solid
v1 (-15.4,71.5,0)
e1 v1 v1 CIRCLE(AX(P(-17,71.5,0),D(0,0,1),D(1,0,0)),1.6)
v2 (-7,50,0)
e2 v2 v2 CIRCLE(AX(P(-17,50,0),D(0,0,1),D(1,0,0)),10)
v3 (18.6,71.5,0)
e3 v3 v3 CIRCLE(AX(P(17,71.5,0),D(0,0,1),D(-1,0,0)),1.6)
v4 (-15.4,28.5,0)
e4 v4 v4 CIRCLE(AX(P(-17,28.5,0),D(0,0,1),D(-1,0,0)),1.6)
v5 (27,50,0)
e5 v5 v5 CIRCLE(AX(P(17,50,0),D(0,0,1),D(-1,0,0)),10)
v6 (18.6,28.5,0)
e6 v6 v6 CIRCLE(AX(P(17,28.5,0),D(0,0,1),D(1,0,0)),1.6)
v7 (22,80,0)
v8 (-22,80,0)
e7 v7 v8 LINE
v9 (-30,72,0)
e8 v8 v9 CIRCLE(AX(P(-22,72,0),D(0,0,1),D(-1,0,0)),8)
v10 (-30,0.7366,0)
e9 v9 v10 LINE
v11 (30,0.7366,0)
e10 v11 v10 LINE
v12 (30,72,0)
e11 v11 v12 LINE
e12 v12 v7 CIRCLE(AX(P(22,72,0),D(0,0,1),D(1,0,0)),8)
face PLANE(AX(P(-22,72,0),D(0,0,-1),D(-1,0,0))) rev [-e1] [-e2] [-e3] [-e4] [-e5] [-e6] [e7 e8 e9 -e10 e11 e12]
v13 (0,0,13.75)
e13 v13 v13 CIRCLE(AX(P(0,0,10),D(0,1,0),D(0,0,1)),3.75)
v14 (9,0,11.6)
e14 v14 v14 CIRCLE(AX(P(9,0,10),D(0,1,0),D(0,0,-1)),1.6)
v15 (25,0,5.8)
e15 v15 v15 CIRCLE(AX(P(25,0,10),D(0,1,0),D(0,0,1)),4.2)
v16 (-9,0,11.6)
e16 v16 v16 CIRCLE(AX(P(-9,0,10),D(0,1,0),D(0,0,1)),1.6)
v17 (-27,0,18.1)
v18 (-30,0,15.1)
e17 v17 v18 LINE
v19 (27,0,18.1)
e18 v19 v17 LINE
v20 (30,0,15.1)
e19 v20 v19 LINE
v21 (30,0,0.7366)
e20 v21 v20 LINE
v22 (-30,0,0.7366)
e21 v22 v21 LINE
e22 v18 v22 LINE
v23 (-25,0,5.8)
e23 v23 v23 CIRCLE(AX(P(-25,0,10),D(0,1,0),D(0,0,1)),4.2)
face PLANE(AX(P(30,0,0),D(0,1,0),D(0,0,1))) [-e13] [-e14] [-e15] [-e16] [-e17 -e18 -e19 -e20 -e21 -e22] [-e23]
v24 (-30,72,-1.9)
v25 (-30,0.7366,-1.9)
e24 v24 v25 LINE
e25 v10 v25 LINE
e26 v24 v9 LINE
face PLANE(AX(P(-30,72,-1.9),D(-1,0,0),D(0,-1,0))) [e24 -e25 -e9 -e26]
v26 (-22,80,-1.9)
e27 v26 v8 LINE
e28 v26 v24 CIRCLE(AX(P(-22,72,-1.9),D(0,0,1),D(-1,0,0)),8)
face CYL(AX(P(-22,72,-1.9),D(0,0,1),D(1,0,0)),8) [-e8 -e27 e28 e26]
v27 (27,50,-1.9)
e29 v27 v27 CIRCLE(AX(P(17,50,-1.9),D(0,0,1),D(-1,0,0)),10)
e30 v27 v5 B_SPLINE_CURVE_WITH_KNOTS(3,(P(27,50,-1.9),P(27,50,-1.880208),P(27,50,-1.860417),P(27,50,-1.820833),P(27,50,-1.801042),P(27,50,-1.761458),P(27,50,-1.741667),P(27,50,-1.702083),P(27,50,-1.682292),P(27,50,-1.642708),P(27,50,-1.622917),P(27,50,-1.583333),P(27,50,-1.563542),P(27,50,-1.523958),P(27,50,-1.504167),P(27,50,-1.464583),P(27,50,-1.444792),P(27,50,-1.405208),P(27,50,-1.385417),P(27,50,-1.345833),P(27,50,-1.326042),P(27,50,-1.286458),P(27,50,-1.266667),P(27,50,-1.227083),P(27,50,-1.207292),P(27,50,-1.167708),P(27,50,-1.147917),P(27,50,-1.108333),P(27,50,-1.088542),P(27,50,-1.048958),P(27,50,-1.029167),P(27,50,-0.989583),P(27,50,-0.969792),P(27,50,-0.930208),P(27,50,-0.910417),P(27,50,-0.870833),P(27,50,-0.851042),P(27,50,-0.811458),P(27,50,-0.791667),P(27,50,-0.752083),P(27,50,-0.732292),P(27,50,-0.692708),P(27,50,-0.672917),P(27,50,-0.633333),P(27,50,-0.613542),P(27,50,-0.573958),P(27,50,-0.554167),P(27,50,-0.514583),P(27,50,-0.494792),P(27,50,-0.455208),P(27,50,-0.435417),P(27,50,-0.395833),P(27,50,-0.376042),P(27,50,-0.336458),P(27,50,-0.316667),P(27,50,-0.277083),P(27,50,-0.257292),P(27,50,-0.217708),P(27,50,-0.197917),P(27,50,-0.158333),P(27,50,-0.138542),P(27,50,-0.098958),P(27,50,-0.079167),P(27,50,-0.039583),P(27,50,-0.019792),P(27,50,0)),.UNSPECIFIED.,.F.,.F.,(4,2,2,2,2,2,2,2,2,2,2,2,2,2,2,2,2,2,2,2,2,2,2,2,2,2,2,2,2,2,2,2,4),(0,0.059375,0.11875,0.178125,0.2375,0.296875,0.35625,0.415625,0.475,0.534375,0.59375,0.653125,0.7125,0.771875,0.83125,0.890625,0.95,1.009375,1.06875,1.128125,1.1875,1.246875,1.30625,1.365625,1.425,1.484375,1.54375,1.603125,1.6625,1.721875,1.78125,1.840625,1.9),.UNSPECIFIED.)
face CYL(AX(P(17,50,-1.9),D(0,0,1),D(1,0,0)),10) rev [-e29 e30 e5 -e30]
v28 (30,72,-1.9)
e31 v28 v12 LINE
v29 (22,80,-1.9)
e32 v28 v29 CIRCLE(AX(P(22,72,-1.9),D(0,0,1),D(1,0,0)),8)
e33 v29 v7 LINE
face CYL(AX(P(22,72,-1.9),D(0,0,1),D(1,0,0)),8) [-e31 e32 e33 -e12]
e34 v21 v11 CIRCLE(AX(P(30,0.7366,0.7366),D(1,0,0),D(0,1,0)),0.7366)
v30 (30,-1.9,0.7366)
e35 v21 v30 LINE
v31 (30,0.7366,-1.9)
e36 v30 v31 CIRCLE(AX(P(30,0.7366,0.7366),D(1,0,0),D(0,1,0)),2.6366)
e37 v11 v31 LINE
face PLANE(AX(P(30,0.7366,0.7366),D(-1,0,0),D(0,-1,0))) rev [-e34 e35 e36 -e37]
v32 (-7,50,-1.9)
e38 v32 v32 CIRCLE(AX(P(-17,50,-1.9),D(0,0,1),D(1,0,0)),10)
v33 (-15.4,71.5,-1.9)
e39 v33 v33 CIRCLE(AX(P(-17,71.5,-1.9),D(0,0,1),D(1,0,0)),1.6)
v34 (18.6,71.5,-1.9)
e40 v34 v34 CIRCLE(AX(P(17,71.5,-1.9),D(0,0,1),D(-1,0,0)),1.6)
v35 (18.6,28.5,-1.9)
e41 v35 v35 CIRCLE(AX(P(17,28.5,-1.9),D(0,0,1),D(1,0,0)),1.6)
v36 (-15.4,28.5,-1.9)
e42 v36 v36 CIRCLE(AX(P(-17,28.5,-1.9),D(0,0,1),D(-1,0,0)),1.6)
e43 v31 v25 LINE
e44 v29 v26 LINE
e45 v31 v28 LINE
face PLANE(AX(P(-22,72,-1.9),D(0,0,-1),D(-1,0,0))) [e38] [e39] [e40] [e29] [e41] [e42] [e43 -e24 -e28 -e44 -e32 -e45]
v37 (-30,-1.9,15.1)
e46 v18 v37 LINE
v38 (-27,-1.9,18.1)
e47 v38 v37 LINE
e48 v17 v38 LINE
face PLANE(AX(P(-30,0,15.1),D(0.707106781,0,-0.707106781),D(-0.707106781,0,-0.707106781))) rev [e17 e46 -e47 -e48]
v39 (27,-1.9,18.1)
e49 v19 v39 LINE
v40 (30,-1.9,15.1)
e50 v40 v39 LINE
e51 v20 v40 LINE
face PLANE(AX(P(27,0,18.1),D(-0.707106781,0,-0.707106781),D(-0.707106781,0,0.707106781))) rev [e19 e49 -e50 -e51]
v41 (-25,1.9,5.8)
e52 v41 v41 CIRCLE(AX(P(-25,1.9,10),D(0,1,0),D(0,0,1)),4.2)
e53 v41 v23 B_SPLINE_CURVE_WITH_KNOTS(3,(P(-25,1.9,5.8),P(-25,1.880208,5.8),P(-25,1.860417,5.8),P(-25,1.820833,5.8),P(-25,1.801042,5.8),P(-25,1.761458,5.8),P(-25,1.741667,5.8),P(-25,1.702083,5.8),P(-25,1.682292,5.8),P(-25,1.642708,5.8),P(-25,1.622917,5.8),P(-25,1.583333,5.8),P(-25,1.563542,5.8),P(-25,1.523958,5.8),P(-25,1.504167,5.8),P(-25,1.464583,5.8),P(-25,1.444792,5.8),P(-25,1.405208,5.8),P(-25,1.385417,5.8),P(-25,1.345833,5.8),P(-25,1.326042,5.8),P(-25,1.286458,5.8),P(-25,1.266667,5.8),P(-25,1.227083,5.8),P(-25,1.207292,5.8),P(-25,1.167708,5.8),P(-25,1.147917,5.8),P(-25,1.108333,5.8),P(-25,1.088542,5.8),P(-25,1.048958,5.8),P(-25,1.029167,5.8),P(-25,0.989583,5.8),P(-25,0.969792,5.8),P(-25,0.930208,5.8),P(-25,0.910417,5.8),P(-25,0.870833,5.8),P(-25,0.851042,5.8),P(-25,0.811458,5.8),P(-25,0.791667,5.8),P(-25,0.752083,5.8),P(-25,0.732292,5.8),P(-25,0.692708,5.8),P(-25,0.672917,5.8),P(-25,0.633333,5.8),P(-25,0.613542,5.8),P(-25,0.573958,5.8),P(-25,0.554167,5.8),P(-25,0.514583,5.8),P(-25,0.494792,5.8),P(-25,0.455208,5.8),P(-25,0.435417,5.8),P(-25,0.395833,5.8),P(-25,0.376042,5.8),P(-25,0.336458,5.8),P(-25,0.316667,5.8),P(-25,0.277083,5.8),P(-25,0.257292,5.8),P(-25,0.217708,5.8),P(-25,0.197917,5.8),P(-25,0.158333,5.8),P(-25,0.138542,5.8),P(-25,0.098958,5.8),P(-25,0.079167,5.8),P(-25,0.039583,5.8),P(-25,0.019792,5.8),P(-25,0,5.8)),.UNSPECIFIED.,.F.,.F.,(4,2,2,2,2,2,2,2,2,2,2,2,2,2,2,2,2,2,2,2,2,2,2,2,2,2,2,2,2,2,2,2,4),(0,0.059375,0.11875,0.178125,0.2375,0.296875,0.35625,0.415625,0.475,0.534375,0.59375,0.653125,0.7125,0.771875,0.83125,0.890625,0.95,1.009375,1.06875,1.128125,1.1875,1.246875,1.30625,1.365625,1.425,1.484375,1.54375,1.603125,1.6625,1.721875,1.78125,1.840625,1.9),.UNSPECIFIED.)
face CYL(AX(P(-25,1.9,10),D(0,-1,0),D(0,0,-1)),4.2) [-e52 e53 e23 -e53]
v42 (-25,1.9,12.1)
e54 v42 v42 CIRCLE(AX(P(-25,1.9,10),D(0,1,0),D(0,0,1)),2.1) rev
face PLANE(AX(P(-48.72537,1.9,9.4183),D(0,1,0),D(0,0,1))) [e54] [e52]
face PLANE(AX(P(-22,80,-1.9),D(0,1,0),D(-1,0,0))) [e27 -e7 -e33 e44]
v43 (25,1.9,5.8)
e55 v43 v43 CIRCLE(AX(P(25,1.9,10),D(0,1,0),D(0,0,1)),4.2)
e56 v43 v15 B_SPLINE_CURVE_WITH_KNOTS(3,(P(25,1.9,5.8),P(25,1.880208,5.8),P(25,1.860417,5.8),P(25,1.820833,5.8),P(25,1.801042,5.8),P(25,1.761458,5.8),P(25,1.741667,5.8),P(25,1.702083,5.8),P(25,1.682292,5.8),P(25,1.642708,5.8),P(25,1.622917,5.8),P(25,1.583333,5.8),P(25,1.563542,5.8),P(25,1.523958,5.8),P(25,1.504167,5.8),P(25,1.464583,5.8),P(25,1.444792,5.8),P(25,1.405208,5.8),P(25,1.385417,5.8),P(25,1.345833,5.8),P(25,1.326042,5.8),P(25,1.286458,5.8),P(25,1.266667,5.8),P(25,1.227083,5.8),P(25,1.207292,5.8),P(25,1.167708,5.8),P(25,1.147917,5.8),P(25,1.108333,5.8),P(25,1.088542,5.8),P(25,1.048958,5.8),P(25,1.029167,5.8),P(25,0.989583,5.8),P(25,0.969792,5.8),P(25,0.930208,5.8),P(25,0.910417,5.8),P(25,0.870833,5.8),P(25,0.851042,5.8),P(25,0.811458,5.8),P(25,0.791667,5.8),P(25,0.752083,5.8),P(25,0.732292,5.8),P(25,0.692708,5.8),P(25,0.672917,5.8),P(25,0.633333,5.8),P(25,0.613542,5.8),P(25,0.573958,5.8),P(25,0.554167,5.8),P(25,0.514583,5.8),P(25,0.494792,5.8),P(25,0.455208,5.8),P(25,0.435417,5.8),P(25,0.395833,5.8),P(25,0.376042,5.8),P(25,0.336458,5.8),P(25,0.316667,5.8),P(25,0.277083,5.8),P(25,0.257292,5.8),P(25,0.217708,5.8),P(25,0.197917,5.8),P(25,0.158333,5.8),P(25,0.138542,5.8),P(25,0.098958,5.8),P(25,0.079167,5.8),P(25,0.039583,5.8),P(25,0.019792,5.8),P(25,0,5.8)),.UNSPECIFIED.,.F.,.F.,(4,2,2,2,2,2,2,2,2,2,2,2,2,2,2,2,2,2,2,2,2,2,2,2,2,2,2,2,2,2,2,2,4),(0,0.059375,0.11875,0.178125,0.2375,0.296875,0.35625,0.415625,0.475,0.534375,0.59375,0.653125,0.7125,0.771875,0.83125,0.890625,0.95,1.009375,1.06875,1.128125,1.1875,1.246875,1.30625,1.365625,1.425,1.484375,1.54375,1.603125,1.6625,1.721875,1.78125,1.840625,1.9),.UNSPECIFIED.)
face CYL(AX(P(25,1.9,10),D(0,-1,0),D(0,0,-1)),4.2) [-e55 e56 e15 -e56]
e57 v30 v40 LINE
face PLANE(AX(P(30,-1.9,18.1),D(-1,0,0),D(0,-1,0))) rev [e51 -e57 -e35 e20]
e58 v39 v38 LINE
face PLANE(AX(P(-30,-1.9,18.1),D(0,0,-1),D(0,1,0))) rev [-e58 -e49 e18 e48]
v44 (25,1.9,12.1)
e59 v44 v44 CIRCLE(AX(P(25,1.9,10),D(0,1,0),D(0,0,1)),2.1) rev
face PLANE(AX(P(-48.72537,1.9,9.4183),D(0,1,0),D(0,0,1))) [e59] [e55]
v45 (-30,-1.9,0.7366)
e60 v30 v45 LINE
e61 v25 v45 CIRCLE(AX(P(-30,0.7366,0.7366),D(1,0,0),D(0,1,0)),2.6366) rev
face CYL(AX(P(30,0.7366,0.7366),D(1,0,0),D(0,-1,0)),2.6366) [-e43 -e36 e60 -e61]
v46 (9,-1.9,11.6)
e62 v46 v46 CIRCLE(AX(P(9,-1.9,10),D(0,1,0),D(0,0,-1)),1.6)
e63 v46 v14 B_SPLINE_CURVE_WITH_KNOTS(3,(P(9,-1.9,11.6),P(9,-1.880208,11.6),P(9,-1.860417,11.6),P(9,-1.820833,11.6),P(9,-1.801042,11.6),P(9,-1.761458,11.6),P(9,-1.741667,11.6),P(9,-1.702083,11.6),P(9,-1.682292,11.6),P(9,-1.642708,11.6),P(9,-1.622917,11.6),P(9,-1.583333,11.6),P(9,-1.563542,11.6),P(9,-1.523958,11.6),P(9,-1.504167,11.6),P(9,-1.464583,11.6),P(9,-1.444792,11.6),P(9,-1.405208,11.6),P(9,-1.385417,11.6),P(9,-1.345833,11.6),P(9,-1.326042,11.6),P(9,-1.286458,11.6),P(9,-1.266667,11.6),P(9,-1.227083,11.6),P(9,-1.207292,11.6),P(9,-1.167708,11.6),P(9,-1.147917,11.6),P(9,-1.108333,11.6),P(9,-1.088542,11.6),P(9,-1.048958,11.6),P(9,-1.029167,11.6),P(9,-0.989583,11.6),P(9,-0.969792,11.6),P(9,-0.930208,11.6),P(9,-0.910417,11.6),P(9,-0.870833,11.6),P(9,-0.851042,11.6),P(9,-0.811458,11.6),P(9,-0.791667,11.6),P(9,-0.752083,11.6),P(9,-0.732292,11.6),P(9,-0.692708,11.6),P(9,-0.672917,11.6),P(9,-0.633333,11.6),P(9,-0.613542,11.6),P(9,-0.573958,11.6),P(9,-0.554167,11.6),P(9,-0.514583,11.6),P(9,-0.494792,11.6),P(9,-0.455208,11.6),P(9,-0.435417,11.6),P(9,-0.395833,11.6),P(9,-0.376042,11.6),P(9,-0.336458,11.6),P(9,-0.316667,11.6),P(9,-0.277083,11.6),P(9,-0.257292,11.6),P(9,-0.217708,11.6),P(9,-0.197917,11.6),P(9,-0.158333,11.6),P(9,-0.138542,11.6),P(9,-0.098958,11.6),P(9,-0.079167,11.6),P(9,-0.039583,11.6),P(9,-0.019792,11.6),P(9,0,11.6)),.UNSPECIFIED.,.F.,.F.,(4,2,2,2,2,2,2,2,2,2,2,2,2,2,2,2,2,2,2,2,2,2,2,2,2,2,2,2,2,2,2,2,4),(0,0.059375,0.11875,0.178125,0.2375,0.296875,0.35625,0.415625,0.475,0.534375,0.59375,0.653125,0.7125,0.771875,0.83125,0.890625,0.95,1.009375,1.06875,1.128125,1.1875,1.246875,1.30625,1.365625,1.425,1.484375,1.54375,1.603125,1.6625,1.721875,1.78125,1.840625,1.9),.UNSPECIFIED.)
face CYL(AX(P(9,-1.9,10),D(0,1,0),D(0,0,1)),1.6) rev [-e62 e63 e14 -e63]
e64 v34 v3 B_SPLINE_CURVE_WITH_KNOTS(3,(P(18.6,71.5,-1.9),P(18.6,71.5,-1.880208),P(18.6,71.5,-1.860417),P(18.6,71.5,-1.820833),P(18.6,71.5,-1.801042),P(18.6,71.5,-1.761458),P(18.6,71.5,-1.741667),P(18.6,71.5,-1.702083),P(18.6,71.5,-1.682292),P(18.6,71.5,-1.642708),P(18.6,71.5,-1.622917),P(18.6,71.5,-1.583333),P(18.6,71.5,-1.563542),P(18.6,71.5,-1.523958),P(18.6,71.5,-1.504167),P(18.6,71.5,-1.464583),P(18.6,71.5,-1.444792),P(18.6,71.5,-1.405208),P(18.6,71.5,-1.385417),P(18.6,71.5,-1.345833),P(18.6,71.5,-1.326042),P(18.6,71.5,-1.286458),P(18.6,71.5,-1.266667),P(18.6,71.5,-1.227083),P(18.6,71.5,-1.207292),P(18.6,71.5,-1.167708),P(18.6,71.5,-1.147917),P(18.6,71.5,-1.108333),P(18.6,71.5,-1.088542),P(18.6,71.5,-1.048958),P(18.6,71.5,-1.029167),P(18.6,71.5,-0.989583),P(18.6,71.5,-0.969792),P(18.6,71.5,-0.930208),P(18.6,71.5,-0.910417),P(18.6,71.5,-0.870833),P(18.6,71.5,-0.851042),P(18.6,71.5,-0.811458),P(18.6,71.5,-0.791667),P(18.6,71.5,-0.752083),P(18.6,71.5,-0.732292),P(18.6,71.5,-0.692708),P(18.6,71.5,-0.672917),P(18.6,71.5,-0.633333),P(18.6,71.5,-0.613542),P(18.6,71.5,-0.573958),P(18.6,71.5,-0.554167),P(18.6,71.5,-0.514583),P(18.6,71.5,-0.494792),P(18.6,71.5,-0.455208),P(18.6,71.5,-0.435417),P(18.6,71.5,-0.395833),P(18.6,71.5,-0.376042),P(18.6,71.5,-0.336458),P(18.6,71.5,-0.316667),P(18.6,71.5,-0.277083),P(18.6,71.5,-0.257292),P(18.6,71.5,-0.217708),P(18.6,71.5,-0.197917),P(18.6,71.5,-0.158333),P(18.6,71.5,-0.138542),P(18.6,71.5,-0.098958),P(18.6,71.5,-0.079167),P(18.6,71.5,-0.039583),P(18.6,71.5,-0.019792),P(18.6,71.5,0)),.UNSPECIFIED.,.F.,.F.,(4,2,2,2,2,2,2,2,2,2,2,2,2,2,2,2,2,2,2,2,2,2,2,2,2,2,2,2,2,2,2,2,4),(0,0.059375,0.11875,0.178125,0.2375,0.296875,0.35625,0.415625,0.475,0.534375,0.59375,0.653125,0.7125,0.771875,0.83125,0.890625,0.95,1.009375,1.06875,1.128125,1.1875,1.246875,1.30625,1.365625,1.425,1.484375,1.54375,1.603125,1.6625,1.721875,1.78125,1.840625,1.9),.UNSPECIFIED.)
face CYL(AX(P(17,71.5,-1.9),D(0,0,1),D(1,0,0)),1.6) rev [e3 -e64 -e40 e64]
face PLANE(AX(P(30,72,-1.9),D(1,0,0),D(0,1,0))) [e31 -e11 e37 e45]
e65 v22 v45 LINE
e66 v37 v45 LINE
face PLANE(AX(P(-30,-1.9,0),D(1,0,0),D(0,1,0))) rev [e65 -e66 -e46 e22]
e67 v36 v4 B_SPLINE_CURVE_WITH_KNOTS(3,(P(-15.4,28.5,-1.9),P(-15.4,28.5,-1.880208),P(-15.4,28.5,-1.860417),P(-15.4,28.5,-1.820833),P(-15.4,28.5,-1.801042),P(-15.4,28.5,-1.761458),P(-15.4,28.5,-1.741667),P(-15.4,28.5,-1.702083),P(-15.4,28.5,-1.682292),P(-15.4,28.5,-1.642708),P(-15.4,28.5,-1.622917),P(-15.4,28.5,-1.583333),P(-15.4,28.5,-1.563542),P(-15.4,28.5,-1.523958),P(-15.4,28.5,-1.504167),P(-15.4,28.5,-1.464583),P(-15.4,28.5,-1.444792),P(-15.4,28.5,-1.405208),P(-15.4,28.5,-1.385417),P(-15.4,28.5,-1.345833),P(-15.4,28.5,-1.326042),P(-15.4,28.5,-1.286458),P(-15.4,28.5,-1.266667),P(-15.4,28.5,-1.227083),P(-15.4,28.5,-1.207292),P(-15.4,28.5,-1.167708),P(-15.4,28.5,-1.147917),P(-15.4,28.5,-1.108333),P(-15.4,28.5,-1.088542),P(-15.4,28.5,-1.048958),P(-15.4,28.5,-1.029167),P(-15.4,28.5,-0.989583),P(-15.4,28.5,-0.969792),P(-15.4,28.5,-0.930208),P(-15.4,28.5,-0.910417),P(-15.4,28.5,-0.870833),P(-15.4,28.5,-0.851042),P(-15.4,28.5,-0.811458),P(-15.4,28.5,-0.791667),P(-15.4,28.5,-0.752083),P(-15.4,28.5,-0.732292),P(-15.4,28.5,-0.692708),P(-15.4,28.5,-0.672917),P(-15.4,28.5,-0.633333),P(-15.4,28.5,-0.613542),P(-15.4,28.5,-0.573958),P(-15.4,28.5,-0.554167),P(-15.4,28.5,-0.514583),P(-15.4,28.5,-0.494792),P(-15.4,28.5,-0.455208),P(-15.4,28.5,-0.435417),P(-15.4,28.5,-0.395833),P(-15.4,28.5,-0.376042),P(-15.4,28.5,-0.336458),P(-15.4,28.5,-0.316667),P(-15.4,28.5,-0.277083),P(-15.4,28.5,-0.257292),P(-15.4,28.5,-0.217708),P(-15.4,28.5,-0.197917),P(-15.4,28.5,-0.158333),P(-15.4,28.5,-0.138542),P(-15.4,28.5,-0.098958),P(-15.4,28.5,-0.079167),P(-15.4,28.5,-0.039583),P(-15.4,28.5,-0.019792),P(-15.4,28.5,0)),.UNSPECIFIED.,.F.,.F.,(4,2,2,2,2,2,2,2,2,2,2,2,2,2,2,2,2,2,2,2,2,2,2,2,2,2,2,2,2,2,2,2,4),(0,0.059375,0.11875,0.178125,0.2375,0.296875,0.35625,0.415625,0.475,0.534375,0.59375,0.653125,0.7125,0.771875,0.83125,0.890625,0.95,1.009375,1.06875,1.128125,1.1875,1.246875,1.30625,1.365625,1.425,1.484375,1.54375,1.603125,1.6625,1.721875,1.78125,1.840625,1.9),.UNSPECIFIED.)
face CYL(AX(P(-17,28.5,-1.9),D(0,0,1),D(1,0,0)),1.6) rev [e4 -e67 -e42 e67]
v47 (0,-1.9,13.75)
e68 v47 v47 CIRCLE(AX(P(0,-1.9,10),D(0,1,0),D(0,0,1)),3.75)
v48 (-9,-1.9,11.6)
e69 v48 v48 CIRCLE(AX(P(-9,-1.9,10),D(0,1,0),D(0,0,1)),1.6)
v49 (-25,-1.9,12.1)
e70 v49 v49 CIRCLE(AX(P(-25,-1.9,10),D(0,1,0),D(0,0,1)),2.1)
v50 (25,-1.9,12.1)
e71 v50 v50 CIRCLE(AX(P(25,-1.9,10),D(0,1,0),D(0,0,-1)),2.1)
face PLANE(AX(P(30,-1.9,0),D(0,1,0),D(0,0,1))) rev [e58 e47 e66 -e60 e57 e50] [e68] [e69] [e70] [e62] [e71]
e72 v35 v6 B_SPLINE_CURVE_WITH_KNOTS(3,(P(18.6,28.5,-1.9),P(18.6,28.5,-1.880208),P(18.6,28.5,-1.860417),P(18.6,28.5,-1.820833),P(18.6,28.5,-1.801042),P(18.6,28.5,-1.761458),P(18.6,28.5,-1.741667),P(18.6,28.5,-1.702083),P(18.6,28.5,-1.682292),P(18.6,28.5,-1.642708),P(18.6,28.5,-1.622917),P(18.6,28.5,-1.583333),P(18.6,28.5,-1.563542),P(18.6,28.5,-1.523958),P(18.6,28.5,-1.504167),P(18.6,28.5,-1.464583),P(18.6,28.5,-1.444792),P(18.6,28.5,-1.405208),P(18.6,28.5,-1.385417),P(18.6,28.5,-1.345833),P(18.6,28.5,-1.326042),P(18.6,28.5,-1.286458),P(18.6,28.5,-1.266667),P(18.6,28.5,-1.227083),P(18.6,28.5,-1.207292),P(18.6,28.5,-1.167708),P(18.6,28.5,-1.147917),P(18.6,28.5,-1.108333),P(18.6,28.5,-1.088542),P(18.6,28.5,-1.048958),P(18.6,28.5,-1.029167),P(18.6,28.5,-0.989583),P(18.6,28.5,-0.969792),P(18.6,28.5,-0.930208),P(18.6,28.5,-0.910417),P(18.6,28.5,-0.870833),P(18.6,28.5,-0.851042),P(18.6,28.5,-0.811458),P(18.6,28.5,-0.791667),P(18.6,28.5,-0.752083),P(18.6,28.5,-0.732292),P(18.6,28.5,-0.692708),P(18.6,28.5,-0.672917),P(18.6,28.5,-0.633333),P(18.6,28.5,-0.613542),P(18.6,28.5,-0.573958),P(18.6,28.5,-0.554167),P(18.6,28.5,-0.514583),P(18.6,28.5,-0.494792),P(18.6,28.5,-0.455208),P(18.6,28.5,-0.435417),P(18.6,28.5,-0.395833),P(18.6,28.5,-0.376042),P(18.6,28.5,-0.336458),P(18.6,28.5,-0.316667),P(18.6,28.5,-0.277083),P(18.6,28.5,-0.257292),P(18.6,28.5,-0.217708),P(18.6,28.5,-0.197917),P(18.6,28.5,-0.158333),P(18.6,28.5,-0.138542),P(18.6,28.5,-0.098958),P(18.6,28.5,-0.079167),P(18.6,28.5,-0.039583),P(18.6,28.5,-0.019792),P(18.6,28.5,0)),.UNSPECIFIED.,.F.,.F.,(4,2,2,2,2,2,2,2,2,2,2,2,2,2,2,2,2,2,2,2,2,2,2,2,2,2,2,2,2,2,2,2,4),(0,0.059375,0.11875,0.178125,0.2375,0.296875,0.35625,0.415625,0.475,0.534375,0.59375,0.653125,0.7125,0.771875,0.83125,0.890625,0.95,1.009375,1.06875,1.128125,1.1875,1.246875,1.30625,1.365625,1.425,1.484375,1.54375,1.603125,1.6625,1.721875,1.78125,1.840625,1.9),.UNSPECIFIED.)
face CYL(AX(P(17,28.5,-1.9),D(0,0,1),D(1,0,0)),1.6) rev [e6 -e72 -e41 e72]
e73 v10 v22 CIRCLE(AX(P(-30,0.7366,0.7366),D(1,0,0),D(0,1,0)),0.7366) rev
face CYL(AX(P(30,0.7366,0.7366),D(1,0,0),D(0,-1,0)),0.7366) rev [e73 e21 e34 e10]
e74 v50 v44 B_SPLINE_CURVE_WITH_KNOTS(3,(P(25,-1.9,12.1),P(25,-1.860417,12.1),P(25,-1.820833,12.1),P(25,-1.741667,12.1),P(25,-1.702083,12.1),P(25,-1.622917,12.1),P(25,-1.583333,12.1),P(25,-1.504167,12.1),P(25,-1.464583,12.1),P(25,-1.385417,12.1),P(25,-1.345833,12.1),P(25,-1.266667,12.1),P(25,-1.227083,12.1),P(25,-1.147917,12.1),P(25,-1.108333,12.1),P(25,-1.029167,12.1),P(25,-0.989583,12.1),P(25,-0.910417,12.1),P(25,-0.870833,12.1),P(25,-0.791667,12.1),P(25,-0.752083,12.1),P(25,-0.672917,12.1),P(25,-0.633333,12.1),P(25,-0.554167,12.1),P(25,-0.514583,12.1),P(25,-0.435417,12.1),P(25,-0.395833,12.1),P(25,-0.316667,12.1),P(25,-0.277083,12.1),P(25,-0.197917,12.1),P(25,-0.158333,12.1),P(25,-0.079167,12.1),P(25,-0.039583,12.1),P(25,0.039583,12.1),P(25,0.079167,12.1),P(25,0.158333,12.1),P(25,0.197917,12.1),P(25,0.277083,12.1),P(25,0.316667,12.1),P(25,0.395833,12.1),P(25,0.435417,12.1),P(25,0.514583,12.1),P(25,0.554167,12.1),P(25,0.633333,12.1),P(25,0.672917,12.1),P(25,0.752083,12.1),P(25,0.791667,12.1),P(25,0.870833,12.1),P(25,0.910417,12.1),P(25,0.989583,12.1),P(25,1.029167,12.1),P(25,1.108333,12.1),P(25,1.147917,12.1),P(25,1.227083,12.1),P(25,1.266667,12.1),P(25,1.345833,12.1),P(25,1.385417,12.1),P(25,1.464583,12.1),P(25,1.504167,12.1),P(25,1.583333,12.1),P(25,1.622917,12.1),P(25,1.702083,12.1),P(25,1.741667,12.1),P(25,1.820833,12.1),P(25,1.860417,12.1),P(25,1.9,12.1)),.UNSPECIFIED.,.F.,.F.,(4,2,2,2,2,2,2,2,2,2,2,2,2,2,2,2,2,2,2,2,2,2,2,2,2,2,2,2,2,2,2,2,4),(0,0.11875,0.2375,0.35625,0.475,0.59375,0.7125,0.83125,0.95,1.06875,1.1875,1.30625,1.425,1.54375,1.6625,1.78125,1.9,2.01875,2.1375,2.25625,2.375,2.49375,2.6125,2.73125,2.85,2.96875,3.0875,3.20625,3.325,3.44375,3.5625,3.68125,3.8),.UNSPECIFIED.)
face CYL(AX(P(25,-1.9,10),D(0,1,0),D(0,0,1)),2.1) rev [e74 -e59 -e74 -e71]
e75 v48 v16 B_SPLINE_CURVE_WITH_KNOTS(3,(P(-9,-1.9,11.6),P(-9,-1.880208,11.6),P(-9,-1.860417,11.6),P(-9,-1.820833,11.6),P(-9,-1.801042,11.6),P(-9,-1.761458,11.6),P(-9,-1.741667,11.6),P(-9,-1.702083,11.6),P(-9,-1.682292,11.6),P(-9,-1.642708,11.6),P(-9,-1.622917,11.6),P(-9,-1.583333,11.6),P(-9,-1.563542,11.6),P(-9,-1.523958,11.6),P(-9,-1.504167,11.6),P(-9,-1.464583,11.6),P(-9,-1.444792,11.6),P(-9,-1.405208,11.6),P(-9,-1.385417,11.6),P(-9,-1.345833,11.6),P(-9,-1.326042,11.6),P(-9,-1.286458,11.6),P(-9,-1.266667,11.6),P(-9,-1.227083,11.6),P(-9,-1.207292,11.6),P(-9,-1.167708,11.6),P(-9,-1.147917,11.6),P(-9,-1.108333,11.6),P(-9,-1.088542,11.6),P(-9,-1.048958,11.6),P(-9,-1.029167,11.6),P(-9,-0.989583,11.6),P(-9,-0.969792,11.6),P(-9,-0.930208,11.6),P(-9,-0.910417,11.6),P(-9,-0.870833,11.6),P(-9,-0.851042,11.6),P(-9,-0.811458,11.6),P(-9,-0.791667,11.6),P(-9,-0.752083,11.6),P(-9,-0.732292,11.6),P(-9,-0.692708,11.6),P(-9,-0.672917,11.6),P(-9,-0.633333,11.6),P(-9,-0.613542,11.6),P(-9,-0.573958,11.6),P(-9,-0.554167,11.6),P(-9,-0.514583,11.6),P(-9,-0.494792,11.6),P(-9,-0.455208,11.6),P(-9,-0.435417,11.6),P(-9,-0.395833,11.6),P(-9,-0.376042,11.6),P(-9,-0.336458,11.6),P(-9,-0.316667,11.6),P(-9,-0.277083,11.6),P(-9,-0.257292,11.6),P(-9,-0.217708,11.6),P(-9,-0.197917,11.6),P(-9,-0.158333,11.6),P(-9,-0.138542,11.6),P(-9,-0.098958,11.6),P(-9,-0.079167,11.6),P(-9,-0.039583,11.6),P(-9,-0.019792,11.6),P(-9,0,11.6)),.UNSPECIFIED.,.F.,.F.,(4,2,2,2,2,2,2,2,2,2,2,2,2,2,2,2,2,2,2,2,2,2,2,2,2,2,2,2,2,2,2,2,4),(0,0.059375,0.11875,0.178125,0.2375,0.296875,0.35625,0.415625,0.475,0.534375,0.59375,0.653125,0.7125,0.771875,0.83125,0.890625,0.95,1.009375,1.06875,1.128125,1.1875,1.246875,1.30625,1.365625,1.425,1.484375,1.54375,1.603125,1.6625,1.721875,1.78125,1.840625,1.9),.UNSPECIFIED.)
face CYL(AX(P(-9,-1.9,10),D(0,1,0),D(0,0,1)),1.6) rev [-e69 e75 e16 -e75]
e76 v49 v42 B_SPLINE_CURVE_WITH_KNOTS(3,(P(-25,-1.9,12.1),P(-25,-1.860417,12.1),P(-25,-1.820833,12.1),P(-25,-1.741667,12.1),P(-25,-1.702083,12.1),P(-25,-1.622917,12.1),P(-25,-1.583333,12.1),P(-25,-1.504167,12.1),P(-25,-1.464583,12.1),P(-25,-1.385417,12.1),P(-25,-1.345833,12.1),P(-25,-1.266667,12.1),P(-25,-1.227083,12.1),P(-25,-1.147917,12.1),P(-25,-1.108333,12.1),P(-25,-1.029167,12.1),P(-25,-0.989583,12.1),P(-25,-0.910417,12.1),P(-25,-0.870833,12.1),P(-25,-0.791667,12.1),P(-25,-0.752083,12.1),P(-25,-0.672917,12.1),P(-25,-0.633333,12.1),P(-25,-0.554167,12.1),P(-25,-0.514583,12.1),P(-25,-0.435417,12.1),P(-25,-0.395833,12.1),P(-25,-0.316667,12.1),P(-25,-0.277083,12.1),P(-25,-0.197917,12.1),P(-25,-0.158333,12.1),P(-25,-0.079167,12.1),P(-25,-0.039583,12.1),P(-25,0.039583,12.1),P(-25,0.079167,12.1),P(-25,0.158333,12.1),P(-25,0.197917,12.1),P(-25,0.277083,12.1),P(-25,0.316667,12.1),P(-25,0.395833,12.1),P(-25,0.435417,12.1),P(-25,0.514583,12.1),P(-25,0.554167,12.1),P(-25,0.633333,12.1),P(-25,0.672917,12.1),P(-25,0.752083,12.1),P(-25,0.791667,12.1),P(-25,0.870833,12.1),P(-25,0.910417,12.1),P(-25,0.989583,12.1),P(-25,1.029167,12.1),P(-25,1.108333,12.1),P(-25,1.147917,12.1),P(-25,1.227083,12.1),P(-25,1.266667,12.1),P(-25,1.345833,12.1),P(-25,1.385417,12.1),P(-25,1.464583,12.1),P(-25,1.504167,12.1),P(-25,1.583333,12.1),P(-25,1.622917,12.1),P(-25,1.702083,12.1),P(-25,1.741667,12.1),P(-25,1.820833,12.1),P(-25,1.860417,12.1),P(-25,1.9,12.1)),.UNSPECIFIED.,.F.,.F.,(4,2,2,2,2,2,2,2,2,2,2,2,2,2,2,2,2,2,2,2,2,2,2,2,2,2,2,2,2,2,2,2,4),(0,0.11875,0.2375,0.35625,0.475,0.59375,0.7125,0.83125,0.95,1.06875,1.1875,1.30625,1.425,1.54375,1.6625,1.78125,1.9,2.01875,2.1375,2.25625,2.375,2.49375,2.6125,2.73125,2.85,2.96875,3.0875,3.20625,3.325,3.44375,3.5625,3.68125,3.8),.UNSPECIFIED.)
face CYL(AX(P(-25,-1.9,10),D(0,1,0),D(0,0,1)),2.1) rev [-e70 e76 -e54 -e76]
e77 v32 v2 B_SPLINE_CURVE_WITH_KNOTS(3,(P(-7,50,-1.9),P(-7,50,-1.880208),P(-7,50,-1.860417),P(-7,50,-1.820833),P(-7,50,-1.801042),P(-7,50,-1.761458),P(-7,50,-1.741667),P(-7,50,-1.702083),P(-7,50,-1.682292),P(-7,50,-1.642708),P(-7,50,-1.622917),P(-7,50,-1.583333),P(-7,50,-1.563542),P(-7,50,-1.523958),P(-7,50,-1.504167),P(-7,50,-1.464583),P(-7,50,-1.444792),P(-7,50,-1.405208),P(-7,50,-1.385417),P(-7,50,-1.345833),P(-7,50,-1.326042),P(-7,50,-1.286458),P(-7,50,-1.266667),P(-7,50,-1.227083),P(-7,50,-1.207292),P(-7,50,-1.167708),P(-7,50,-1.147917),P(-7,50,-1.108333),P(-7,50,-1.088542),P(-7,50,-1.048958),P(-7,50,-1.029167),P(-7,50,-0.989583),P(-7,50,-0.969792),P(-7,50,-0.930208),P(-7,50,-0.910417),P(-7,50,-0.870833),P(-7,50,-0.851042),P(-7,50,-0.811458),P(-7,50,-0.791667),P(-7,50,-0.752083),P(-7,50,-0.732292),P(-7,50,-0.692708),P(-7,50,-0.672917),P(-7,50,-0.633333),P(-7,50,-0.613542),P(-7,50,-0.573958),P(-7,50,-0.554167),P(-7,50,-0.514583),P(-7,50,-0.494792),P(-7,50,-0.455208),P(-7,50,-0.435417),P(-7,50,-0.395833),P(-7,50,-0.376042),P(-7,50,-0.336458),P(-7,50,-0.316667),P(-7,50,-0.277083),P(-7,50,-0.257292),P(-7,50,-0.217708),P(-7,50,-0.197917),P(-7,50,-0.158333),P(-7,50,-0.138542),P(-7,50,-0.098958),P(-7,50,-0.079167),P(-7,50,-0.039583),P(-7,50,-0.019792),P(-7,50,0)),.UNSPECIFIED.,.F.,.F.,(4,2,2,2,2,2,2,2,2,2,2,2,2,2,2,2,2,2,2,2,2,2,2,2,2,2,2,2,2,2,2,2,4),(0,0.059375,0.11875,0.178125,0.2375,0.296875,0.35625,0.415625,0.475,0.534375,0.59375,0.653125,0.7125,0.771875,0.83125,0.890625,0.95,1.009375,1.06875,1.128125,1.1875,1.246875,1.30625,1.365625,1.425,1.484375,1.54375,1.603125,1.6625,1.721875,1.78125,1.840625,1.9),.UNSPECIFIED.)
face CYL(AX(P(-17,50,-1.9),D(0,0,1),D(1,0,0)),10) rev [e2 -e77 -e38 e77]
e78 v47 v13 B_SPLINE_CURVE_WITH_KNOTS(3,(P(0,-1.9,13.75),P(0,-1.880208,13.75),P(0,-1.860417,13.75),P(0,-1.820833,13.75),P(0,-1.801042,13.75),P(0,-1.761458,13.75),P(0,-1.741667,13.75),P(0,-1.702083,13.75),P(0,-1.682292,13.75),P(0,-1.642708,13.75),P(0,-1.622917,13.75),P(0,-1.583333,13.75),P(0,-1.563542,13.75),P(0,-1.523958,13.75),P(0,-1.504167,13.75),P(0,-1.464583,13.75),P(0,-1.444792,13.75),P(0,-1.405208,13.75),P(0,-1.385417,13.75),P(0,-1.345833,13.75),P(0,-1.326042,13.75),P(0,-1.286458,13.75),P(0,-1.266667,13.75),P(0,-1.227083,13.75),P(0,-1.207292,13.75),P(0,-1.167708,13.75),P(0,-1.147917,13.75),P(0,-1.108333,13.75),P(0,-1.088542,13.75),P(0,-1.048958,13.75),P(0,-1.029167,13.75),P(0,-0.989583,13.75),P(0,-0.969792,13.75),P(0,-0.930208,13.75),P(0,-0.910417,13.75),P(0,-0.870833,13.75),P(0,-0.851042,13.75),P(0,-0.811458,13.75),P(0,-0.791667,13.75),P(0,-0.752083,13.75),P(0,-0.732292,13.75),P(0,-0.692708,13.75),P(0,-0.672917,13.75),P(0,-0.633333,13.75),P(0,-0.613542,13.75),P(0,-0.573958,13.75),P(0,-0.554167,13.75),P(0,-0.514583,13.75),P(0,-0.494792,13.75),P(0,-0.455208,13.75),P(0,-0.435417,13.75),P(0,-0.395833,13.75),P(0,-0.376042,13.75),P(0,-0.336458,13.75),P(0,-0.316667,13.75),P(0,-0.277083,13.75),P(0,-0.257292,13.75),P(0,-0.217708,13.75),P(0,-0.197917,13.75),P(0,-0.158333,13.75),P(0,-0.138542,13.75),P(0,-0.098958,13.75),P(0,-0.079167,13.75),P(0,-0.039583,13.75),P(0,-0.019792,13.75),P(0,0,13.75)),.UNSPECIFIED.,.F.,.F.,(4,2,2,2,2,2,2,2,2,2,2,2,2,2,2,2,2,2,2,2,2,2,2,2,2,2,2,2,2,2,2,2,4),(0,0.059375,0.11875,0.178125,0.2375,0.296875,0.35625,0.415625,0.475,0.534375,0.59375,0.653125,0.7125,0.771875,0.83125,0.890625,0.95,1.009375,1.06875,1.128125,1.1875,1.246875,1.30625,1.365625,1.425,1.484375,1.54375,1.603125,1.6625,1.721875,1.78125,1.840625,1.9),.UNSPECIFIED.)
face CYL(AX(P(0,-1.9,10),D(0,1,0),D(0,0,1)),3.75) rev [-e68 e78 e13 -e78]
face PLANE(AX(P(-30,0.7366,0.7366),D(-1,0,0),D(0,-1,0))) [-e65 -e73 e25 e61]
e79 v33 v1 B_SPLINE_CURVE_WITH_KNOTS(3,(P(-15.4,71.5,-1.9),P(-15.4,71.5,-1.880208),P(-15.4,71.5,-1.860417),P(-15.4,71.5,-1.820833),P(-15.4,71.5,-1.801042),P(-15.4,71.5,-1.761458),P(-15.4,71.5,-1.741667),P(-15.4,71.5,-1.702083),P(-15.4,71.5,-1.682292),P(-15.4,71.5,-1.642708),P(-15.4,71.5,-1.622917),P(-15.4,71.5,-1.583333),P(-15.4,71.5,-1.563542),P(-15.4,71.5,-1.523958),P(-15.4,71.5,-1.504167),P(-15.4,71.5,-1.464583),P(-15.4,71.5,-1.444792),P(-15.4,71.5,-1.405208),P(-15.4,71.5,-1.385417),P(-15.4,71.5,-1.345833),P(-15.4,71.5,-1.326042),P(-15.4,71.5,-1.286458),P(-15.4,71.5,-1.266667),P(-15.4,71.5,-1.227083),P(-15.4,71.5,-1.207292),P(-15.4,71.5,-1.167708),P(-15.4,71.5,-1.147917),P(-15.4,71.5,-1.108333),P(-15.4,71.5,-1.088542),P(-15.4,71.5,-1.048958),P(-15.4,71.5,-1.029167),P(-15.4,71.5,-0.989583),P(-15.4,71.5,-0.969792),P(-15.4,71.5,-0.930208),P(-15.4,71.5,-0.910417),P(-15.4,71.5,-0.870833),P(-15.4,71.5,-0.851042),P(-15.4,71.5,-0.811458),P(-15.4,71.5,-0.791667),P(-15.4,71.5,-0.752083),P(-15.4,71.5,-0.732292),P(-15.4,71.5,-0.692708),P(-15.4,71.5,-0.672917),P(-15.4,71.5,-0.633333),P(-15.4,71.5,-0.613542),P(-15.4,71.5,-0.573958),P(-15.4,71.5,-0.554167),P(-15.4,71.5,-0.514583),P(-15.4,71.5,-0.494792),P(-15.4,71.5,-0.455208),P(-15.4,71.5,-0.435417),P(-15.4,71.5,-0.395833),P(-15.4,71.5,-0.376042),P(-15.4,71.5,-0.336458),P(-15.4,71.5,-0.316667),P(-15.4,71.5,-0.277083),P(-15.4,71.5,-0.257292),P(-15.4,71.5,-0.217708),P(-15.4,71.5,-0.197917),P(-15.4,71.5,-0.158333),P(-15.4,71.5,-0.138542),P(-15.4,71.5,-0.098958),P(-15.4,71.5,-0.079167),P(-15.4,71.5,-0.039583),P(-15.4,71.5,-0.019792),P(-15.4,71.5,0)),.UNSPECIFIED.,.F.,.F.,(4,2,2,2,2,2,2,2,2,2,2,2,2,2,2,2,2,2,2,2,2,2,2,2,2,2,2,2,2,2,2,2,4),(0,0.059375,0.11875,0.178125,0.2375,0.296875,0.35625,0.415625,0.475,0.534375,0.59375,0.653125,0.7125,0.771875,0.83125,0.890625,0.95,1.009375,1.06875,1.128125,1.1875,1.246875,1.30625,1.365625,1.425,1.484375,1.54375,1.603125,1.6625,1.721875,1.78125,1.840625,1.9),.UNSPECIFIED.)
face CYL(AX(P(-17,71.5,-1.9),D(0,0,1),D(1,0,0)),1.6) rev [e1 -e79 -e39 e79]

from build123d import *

# Parameters (mm, degrees)
SM_BASE_FLANGE_1_DEPTH           = 1.9
SM_EDGE_FLANGE_1_STRIP_W         = 9.0732
SM_EDGE_FLANGE_1_STRIP_H         = 1.9
SM_EDGE_FLANGE_1_STRIP_CUT_DEPTH = 60
SM_EDGE_FLANGE_1_DEPTH           = 60
CUT_EXTRUDE_1_DEPTH              = 88.336189521
SKETCH_9_R                       = 2.1
SKETCH_9_R_2                     = 1.6
SKETCH_9_R_3                     = 3.75
CUT_EXTRUDE_2_DEPTH              = 88.336189521
EXTRUDE_START                    = 1.9
SKETCH_10_R                      = 4.2
SKETCH_10_R_2                    = 2.1
EXTRUDE_2_DEPTH                  = 1.9
SKETCH_11_R                      = 1.6
SKETCH_11_R_2                    = 10
CUT_EXTRUDE_3_DEPTH              = 88.336189521


# Sheet-metal steps are written as plain solids
with BuildPart() as part:
    # Sketch 1 → 基体-法兰1 (new body)
    with BuildSketch(Plane.XY):
        with BuildLine():
            Line((-22, 80), (22, 80))
            ThreePointArc((22, 80), (27.656854249, 77.656854249), (30, 72))
            Line((30, 72), (30, 0))
            Line((30, 0), (-30, 0))
            Line((-30, 0), (-30, 72))
            ThreePointArc((-30, 72), (-27.656854249, 77.656854249), (-22, 80))
        make_face()
    extrude(amount=-SM_BASE_FLANGE_1_DEPTH)

    # 边线-法兰1 strip (across the edge) → 边线-法兰1 strip cut (cut)
    with BuildSketch(Plane.YZ.offset(-30)):
        with Locations((-3.8, -0.95)):
            Rectangle(SM_EDGE_FLANGE_1_STRIP_W, SM_EDGE_FLANGE_1_STRIP_H)
    extrude(amount=SM_EDGE_FLANGE_1_STRIP_CUT_DEPTH, mode=Mode.SUBTRACT)

    # 边线-法兰1 section (across the edge) → 边线-法兰1 (add)
    with BuildSketch(Plane.YZ.offset(-30)):
        with BuildLine():
            Line((-1.9, 0.7366), (-1.9, 18.1))
            Line((-1.9, 18.1), (0, 18.1))
            Line((0, 18.1), (0, 0.7366))
            ThreePointArc((0, 0.7366), (0.215745145, 0.215745145), (0.7366, 0))
            Line((0.7366, 0), (0.7366, -1.9))
            ThreePointArc((0.7366, -1.9), (-1.127757739, -1.127757739), (-1.9, 0.7366))
        make_face()
    extrude(amount=SM_EDGE_FLANGE_1_DEPTH)

    # 草图8 → 切除-拉伸1 (cut, through all)
    with BuildSketch(Plane(origin=(0, 0, 0), x_dir=(1, 0, 0), z_dir=(0, 1, 0))):
        Polygon((-30, -15.1), (-27, -18.1), (-30, -18.1), align=None)
        Polygon((27, -18.1), (30, -15.1), (30, -18.1), align=None)
    extrude(amount=-CUT_EXTRUDE_1_DEPTH, mode=Mode.SUBTRACT)

    # 草图9 → 切除-拉伸2 (cut, through all)
    with BuildSketch(Plane(origin=(0, 0, 0), x_dir=(1, 0, 0), z_dir=(0, 1, 0))):
        with Locations(Location((-25, -10, 0), (0, 0, 270))):
            Circle(SKETCH_9_R)
        with Locations(Location((-9, -10, 0), (0, 0, 270))):
            Circle(SKETCH_9_R_2)
        with Locations(Location((0, -10, 0), (0, 0, 270))):
            Circle(SKETCH_9_R_3)
        with Locations(Location((9, -10, 0), (0, 0, 270))):
            Circle(SKETCH_9_R_2)
        with Locations(Location((25, -10, 0), (0, 0, 270))):
            Circle(SKETCH_9_R)
    extrude(amount=-CUT_EXTRUDE_2_DEPTH, mode=Mode.SUBTRACT)

    # 草图10 → 凸台-拉伸2 (add)
    # profile 1 of 2: a face of its own
    with BuildSketch(Plane(origin=(0, 0, 0), x_dir=(1, 0, 0), z_dir=(0, 1, 0)).offset(EXTRUDE_START)):
        with Locations(Location((-25, -10, 0), (0, 0, 90))):
            Circle(SKETCH_10_R)
        with Locations(Location((-25, -10, 0), (0, 0, 270))):
            Circle(SKETCH_10_R_2, mode=Mode.SUBTRACT)
    # profile 2 of 2: a face of its own
    with BuildSketch(Plane(origin=(0, 0, 0), x_dir=(1, 0, 0), z_dir=(0, 1, 0)).offset(EXTRUDE_START)):
        with Locations(Location((25, -10, 0), (0, 0, 90))):
            Circle(SKETCH_10_R)
        with Locations(Location((25, -10, 0), (0, 0, 270))):
            Circle(SKETCH_10_R_2, mode=Mode.SUBTRACT)
    extrude(amount=-EXTRUDE_2_DEPTH)

    # 草图11 → 切除-拉伸3 (cut, through all)
    with BuildSketch(Plane.XY):
        with Locations((-17, 71.5)):
            Circle(SKETCH_11_R)
        with Locations((-17, 50)):
            Circle(SKETCH_11_R_2)
        with Locations((-17, 28.5)):
            Circle(SKETCH_11_R)
        with Locations((17, 28.5)):
            Circle(SKETCH_11_R)
        with Locations((17, 50)):
            Circle(SKETCH_11_R_2)
        with Locations((17, 71.5)):
            Circle(SKETCH_11_R)
    extrude(amount=-CUT_EXTRUDE_3_DEPTH, mode=Mode.SUBTRACT)


solid = part.part
